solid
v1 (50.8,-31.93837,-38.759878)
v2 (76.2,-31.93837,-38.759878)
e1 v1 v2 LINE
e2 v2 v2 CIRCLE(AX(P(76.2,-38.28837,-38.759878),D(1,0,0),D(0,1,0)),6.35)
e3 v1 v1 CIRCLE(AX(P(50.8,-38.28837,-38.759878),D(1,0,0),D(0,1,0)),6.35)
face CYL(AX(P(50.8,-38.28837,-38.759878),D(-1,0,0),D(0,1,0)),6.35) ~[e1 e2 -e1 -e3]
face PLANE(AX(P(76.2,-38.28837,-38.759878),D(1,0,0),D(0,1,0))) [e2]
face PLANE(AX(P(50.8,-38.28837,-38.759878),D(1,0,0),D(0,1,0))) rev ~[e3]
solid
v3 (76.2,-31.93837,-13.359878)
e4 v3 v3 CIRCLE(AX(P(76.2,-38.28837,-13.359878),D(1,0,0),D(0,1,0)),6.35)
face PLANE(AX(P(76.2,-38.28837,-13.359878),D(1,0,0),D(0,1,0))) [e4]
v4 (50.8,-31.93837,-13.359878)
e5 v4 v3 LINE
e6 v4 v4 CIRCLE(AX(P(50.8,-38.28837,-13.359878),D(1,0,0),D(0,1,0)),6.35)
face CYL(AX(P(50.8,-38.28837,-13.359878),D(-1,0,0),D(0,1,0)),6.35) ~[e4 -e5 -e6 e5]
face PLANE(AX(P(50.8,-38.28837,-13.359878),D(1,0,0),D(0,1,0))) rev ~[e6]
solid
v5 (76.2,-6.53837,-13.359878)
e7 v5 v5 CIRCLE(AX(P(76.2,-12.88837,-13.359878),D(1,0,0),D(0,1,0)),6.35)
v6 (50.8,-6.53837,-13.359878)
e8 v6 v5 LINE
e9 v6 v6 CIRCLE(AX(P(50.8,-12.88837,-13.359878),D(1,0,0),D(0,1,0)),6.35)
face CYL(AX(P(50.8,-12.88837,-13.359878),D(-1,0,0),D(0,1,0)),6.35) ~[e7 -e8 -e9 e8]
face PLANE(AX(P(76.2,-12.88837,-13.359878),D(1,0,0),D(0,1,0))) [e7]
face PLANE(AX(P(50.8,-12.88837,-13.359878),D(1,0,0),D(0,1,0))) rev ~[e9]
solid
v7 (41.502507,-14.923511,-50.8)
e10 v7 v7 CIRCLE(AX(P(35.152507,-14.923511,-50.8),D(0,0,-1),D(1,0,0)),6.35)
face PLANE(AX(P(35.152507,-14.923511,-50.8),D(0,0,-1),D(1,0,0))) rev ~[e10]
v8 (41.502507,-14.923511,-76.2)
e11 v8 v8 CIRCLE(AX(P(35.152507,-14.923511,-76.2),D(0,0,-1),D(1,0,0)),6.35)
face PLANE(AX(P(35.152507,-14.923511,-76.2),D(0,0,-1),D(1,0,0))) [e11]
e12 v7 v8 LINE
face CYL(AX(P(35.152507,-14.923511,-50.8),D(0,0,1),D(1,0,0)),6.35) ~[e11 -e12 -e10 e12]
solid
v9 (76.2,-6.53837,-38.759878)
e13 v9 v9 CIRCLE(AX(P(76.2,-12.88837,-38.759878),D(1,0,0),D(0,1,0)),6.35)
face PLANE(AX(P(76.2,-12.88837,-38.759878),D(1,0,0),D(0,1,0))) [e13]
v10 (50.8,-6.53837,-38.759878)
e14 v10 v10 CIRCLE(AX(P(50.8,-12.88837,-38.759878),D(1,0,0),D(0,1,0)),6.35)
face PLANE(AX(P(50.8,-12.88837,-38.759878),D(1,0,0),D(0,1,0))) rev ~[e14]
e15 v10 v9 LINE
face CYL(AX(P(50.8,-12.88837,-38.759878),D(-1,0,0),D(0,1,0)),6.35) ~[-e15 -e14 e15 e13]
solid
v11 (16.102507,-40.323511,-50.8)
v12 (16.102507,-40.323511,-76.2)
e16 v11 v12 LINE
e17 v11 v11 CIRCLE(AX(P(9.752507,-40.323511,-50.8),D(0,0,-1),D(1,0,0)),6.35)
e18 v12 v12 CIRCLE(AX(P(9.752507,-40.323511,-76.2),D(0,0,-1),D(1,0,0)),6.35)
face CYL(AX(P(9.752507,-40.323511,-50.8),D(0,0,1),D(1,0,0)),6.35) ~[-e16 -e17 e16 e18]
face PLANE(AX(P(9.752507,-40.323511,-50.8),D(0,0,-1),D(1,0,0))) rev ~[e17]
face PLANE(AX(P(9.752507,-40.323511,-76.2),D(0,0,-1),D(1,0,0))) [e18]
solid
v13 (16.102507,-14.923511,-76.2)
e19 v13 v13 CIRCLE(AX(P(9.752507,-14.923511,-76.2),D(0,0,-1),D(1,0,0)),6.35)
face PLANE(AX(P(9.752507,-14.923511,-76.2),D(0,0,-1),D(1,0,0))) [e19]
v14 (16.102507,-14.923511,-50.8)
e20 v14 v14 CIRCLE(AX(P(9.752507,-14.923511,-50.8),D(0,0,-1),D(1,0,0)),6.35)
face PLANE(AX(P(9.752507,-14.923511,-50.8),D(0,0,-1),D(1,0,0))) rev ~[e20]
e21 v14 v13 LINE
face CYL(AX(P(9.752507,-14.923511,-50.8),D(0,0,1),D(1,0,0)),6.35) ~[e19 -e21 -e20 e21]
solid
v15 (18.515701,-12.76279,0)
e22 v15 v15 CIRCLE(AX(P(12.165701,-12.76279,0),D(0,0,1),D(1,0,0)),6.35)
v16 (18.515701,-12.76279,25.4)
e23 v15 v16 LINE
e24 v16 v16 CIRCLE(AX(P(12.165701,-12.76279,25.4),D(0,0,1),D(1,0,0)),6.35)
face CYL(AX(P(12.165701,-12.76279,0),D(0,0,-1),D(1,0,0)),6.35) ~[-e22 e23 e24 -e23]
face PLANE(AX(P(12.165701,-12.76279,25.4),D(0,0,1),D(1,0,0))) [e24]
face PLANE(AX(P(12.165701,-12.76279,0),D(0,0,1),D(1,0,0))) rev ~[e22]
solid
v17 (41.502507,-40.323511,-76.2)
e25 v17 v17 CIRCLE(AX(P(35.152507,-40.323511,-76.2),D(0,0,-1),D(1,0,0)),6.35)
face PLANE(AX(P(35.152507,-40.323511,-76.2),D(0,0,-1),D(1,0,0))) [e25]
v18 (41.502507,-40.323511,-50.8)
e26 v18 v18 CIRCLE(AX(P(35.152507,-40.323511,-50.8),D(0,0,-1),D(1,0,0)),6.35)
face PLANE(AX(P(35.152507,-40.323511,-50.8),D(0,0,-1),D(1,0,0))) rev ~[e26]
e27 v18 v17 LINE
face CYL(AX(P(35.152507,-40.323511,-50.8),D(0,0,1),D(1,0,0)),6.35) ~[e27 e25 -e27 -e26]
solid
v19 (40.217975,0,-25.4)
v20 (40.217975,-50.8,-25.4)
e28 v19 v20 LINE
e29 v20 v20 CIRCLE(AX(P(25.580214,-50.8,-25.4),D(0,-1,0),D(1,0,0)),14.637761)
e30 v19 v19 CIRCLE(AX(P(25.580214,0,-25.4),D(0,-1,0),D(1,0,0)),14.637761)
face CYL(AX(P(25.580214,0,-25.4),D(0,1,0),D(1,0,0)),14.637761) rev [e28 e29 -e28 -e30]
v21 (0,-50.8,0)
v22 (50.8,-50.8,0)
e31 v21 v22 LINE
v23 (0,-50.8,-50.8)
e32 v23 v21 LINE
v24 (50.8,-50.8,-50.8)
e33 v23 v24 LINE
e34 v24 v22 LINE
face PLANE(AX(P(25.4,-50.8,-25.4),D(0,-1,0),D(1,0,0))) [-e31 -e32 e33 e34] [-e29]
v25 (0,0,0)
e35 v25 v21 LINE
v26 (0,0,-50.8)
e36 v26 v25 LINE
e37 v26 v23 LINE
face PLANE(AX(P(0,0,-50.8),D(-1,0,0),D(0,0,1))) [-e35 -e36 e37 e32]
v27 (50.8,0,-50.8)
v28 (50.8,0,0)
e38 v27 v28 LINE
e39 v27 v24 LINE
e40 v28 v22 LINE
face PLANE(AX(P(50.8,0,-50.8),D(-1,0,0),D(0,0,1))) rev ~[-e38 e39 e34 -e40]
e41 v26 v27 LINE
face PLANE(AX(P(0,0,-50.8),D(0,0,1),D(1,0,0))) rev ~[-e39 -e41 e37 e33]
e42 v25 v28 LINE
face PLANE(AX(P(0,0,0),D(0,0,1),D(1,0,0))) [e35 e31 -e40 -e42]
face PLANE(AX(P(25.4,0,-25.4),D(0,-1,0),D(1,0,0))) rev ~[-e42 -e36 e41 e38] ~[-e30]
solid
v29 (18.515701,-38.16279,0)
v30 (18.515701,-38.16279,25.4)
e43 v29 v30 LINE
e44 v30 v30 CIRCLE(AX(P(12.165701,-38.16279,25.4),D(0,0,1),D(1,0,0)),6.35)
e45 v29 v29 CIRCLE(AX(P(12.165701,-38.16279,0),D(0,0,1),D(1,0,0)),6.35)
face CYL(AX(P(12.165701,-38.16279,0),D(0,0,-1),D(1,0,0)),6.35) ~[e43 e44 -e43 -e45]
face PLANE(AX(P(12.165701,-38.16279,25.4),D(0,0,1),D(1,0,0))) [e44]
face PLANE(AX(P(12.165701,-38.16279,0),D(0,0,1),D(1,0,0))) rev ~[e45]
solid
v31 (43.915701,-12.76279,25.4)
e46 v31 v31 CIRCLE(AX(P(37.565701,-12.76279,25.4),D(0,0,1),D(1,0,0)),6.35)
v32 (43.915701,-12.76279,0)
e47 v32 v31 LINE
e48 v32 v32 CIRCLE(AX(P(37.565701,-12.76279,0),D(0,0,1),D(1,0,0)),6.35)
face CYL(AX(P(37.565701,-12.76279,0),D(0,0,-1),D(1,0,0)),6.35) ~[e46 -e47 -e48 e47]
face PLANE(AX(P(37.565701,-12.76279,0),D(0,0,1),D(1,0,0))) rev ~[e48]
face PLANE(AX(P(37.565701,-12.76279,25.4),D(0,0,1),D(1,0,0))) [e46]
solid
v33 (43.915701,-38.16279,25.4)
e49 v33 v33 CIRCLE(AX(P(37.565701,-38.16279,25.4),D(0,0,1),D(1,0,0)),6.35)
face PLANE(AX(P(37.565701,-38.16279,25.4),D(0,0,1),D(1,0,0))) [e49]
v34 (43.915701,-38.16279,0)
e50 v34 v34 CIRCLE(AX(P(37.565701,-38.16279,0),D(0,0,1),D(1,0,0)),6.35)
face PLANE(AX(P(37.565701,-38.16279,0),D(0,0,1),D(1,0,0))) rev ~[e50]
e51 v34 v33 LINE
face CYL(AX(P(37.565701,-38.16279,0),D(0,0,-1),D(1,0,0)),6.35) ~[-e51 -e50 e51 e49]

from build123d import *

# Parameters (mm, degrees)
F0_W     = 50.8
F0_H     = 50.8
F0_R     = 14.6377609255
F1_DEPTH = 50.8
F2_R     = 6.35
F3_DEPTH = 25.4
F4_R     = 6.35
F5_DEPTH = 25.4
F6_R     = 6.35
F7_DEPTH = 25.4


# Not quite as in the source:
# - the program builds the solid bodies; features that only make, move or delete a surface that nothing else refers to are left out


with BuildPart() as f1:
    # F0 (on Front) → F1 (new body)
    with BuildSketch(Plane.XZ):
        with Locations((25.4, -25.4)):
            Rectangle(F0_W, F0_H)
        with Locations((25.5802143365, -25.4)):
            Circle(F0_R, mode=Mode.SUBTRACT)
    extrude(amount=F1_DEPTH)


with BuildPart() as f3:
    # F2 (on Top) → F3 (new body)
    with BuildSketch(Plane.XY):
        with Locations((37.5657010168, -12.7627896145)):
            Circle(F2_R)
    extrude(amount=F3_DEPTH)


with BuildPart() as f3b:
    # F2 (on Top) → F3, piece 2 (new body)
    with BuildSketch(Plane.XY):
        with Locations((37.5657010168, -38.1627896145)):
            Circle(F2_R)
    extrude(amount=F3_DEPTH)


with BuildPart() as f3c:
    # F2 (on Top) → F3, piece 3 (new body)
    with BuildSketch(Plane.XY):
        with Locations((12.1657010168, -38.1627896145)):
            Circle(F2_R)
    extrude(amount=F3_DEPTH)


with BuildPart() as f3d:
    # F2 (on Top) → F3, piece 4 (new body)
    with BuildSketch(Plane.XY):
        with Locations((12.1657010168, -12.7627896145)):
            Circle(F2_R)
    extrude(amount=F3_DEPTH)


with BuildPart() as f5:
    # F4 (on face) → F5 (new body)
    with BuildSketch(Plane.YZ.offset(50.8)):
        with Locations((-12.8883697748, -38.7598782122)):
            Circle(F4_R)
    extrude(amount=F5_DEPTH)


with BuildPart() as f5b:
    # F4 (on face) → F5, piece 2 (new body)
    with BuildSketch(Plane.YZ.offset(50.8)):
        with Locations((-12.8883697748, -13.3598782122)):
            Circle(F4_R)
    extrude(amount=F5_DEPTH)


with BuildPart() as f5c:
    # F4 (on face) → F5, piece 3 (new body)
    with BuildSketch(Plane.YZ.offset(50.8)):
        with Locations((-38.2883697748, -13.3598782122)):
            Circle(F4_R)
    extrude(amount=F5_DEPTH)


with BuildPart() as f5d:
    # F4 (on face) → F5, piece 4 (new body)
    with BuildSketch(Plane.YZ.offset(50.8)):
        with Locations((-38.2883697748, -38.7598782122)):
            Circle(F4_R)
    extrude(amount=F5_DEPTH)


with BuildPart() as f7:
    # F6 (on face) → F7 (new body)
    with BuildSketch(Plane(origin=(0, 0, -50.8), x_dir=(1, 0, 0), z_dir=(0, 0, -1))):
        with Locations((9.7525073215, 40.323510766)):
            Circle(F6_R)
    extrude(amount=F7_DEPTH)


with BuildPart() as f7b:
    # F6 (on face) → F7, piece 2 (new body)
    with BuildSketch(Plane(origin=(0, 0, -50.8), x_dir=(1, 0, 0), z_dir=(0, 0, -1))):
        with Locations((35.1525073215, 14.923510766)):
            Circle(F6_R)
    extrude(amount=F7_DEPTH)


with BuildPart() as f7c:
    # F6 (on face) → F7, piece 3 (new body)
    with BuildSketch(Plane(origin=(0, 0, -50.8), x_dir=(1, 0, 0), z_dir=(0, 0, -1))):
        with Locations((9.7525073215, 14.923510766)):
            Circle(F6_R)
    extrude(amount=F7_DEPTH)


with BuildPart() as f7d:
    # F6 (on face) → F7, piece 4 (new body)
    with BuildSketch(Plane(origin=(0, 0, -50.8), x_dir=(1, 0, 0), z_dir=(0, 0, -1))):
        with Locations((35.1525073215, 40.323510766)):
            Circle(F6_R)
    extrude(amount=F7_DEPTH)


solid = Compound([f1.part, f3.part, f3b.part, f3c.part, f3d.part, f5.part, f5b.part, f5c.part, f5d.part, f7.part, f7b.part, f7c.part, f7d.part])
